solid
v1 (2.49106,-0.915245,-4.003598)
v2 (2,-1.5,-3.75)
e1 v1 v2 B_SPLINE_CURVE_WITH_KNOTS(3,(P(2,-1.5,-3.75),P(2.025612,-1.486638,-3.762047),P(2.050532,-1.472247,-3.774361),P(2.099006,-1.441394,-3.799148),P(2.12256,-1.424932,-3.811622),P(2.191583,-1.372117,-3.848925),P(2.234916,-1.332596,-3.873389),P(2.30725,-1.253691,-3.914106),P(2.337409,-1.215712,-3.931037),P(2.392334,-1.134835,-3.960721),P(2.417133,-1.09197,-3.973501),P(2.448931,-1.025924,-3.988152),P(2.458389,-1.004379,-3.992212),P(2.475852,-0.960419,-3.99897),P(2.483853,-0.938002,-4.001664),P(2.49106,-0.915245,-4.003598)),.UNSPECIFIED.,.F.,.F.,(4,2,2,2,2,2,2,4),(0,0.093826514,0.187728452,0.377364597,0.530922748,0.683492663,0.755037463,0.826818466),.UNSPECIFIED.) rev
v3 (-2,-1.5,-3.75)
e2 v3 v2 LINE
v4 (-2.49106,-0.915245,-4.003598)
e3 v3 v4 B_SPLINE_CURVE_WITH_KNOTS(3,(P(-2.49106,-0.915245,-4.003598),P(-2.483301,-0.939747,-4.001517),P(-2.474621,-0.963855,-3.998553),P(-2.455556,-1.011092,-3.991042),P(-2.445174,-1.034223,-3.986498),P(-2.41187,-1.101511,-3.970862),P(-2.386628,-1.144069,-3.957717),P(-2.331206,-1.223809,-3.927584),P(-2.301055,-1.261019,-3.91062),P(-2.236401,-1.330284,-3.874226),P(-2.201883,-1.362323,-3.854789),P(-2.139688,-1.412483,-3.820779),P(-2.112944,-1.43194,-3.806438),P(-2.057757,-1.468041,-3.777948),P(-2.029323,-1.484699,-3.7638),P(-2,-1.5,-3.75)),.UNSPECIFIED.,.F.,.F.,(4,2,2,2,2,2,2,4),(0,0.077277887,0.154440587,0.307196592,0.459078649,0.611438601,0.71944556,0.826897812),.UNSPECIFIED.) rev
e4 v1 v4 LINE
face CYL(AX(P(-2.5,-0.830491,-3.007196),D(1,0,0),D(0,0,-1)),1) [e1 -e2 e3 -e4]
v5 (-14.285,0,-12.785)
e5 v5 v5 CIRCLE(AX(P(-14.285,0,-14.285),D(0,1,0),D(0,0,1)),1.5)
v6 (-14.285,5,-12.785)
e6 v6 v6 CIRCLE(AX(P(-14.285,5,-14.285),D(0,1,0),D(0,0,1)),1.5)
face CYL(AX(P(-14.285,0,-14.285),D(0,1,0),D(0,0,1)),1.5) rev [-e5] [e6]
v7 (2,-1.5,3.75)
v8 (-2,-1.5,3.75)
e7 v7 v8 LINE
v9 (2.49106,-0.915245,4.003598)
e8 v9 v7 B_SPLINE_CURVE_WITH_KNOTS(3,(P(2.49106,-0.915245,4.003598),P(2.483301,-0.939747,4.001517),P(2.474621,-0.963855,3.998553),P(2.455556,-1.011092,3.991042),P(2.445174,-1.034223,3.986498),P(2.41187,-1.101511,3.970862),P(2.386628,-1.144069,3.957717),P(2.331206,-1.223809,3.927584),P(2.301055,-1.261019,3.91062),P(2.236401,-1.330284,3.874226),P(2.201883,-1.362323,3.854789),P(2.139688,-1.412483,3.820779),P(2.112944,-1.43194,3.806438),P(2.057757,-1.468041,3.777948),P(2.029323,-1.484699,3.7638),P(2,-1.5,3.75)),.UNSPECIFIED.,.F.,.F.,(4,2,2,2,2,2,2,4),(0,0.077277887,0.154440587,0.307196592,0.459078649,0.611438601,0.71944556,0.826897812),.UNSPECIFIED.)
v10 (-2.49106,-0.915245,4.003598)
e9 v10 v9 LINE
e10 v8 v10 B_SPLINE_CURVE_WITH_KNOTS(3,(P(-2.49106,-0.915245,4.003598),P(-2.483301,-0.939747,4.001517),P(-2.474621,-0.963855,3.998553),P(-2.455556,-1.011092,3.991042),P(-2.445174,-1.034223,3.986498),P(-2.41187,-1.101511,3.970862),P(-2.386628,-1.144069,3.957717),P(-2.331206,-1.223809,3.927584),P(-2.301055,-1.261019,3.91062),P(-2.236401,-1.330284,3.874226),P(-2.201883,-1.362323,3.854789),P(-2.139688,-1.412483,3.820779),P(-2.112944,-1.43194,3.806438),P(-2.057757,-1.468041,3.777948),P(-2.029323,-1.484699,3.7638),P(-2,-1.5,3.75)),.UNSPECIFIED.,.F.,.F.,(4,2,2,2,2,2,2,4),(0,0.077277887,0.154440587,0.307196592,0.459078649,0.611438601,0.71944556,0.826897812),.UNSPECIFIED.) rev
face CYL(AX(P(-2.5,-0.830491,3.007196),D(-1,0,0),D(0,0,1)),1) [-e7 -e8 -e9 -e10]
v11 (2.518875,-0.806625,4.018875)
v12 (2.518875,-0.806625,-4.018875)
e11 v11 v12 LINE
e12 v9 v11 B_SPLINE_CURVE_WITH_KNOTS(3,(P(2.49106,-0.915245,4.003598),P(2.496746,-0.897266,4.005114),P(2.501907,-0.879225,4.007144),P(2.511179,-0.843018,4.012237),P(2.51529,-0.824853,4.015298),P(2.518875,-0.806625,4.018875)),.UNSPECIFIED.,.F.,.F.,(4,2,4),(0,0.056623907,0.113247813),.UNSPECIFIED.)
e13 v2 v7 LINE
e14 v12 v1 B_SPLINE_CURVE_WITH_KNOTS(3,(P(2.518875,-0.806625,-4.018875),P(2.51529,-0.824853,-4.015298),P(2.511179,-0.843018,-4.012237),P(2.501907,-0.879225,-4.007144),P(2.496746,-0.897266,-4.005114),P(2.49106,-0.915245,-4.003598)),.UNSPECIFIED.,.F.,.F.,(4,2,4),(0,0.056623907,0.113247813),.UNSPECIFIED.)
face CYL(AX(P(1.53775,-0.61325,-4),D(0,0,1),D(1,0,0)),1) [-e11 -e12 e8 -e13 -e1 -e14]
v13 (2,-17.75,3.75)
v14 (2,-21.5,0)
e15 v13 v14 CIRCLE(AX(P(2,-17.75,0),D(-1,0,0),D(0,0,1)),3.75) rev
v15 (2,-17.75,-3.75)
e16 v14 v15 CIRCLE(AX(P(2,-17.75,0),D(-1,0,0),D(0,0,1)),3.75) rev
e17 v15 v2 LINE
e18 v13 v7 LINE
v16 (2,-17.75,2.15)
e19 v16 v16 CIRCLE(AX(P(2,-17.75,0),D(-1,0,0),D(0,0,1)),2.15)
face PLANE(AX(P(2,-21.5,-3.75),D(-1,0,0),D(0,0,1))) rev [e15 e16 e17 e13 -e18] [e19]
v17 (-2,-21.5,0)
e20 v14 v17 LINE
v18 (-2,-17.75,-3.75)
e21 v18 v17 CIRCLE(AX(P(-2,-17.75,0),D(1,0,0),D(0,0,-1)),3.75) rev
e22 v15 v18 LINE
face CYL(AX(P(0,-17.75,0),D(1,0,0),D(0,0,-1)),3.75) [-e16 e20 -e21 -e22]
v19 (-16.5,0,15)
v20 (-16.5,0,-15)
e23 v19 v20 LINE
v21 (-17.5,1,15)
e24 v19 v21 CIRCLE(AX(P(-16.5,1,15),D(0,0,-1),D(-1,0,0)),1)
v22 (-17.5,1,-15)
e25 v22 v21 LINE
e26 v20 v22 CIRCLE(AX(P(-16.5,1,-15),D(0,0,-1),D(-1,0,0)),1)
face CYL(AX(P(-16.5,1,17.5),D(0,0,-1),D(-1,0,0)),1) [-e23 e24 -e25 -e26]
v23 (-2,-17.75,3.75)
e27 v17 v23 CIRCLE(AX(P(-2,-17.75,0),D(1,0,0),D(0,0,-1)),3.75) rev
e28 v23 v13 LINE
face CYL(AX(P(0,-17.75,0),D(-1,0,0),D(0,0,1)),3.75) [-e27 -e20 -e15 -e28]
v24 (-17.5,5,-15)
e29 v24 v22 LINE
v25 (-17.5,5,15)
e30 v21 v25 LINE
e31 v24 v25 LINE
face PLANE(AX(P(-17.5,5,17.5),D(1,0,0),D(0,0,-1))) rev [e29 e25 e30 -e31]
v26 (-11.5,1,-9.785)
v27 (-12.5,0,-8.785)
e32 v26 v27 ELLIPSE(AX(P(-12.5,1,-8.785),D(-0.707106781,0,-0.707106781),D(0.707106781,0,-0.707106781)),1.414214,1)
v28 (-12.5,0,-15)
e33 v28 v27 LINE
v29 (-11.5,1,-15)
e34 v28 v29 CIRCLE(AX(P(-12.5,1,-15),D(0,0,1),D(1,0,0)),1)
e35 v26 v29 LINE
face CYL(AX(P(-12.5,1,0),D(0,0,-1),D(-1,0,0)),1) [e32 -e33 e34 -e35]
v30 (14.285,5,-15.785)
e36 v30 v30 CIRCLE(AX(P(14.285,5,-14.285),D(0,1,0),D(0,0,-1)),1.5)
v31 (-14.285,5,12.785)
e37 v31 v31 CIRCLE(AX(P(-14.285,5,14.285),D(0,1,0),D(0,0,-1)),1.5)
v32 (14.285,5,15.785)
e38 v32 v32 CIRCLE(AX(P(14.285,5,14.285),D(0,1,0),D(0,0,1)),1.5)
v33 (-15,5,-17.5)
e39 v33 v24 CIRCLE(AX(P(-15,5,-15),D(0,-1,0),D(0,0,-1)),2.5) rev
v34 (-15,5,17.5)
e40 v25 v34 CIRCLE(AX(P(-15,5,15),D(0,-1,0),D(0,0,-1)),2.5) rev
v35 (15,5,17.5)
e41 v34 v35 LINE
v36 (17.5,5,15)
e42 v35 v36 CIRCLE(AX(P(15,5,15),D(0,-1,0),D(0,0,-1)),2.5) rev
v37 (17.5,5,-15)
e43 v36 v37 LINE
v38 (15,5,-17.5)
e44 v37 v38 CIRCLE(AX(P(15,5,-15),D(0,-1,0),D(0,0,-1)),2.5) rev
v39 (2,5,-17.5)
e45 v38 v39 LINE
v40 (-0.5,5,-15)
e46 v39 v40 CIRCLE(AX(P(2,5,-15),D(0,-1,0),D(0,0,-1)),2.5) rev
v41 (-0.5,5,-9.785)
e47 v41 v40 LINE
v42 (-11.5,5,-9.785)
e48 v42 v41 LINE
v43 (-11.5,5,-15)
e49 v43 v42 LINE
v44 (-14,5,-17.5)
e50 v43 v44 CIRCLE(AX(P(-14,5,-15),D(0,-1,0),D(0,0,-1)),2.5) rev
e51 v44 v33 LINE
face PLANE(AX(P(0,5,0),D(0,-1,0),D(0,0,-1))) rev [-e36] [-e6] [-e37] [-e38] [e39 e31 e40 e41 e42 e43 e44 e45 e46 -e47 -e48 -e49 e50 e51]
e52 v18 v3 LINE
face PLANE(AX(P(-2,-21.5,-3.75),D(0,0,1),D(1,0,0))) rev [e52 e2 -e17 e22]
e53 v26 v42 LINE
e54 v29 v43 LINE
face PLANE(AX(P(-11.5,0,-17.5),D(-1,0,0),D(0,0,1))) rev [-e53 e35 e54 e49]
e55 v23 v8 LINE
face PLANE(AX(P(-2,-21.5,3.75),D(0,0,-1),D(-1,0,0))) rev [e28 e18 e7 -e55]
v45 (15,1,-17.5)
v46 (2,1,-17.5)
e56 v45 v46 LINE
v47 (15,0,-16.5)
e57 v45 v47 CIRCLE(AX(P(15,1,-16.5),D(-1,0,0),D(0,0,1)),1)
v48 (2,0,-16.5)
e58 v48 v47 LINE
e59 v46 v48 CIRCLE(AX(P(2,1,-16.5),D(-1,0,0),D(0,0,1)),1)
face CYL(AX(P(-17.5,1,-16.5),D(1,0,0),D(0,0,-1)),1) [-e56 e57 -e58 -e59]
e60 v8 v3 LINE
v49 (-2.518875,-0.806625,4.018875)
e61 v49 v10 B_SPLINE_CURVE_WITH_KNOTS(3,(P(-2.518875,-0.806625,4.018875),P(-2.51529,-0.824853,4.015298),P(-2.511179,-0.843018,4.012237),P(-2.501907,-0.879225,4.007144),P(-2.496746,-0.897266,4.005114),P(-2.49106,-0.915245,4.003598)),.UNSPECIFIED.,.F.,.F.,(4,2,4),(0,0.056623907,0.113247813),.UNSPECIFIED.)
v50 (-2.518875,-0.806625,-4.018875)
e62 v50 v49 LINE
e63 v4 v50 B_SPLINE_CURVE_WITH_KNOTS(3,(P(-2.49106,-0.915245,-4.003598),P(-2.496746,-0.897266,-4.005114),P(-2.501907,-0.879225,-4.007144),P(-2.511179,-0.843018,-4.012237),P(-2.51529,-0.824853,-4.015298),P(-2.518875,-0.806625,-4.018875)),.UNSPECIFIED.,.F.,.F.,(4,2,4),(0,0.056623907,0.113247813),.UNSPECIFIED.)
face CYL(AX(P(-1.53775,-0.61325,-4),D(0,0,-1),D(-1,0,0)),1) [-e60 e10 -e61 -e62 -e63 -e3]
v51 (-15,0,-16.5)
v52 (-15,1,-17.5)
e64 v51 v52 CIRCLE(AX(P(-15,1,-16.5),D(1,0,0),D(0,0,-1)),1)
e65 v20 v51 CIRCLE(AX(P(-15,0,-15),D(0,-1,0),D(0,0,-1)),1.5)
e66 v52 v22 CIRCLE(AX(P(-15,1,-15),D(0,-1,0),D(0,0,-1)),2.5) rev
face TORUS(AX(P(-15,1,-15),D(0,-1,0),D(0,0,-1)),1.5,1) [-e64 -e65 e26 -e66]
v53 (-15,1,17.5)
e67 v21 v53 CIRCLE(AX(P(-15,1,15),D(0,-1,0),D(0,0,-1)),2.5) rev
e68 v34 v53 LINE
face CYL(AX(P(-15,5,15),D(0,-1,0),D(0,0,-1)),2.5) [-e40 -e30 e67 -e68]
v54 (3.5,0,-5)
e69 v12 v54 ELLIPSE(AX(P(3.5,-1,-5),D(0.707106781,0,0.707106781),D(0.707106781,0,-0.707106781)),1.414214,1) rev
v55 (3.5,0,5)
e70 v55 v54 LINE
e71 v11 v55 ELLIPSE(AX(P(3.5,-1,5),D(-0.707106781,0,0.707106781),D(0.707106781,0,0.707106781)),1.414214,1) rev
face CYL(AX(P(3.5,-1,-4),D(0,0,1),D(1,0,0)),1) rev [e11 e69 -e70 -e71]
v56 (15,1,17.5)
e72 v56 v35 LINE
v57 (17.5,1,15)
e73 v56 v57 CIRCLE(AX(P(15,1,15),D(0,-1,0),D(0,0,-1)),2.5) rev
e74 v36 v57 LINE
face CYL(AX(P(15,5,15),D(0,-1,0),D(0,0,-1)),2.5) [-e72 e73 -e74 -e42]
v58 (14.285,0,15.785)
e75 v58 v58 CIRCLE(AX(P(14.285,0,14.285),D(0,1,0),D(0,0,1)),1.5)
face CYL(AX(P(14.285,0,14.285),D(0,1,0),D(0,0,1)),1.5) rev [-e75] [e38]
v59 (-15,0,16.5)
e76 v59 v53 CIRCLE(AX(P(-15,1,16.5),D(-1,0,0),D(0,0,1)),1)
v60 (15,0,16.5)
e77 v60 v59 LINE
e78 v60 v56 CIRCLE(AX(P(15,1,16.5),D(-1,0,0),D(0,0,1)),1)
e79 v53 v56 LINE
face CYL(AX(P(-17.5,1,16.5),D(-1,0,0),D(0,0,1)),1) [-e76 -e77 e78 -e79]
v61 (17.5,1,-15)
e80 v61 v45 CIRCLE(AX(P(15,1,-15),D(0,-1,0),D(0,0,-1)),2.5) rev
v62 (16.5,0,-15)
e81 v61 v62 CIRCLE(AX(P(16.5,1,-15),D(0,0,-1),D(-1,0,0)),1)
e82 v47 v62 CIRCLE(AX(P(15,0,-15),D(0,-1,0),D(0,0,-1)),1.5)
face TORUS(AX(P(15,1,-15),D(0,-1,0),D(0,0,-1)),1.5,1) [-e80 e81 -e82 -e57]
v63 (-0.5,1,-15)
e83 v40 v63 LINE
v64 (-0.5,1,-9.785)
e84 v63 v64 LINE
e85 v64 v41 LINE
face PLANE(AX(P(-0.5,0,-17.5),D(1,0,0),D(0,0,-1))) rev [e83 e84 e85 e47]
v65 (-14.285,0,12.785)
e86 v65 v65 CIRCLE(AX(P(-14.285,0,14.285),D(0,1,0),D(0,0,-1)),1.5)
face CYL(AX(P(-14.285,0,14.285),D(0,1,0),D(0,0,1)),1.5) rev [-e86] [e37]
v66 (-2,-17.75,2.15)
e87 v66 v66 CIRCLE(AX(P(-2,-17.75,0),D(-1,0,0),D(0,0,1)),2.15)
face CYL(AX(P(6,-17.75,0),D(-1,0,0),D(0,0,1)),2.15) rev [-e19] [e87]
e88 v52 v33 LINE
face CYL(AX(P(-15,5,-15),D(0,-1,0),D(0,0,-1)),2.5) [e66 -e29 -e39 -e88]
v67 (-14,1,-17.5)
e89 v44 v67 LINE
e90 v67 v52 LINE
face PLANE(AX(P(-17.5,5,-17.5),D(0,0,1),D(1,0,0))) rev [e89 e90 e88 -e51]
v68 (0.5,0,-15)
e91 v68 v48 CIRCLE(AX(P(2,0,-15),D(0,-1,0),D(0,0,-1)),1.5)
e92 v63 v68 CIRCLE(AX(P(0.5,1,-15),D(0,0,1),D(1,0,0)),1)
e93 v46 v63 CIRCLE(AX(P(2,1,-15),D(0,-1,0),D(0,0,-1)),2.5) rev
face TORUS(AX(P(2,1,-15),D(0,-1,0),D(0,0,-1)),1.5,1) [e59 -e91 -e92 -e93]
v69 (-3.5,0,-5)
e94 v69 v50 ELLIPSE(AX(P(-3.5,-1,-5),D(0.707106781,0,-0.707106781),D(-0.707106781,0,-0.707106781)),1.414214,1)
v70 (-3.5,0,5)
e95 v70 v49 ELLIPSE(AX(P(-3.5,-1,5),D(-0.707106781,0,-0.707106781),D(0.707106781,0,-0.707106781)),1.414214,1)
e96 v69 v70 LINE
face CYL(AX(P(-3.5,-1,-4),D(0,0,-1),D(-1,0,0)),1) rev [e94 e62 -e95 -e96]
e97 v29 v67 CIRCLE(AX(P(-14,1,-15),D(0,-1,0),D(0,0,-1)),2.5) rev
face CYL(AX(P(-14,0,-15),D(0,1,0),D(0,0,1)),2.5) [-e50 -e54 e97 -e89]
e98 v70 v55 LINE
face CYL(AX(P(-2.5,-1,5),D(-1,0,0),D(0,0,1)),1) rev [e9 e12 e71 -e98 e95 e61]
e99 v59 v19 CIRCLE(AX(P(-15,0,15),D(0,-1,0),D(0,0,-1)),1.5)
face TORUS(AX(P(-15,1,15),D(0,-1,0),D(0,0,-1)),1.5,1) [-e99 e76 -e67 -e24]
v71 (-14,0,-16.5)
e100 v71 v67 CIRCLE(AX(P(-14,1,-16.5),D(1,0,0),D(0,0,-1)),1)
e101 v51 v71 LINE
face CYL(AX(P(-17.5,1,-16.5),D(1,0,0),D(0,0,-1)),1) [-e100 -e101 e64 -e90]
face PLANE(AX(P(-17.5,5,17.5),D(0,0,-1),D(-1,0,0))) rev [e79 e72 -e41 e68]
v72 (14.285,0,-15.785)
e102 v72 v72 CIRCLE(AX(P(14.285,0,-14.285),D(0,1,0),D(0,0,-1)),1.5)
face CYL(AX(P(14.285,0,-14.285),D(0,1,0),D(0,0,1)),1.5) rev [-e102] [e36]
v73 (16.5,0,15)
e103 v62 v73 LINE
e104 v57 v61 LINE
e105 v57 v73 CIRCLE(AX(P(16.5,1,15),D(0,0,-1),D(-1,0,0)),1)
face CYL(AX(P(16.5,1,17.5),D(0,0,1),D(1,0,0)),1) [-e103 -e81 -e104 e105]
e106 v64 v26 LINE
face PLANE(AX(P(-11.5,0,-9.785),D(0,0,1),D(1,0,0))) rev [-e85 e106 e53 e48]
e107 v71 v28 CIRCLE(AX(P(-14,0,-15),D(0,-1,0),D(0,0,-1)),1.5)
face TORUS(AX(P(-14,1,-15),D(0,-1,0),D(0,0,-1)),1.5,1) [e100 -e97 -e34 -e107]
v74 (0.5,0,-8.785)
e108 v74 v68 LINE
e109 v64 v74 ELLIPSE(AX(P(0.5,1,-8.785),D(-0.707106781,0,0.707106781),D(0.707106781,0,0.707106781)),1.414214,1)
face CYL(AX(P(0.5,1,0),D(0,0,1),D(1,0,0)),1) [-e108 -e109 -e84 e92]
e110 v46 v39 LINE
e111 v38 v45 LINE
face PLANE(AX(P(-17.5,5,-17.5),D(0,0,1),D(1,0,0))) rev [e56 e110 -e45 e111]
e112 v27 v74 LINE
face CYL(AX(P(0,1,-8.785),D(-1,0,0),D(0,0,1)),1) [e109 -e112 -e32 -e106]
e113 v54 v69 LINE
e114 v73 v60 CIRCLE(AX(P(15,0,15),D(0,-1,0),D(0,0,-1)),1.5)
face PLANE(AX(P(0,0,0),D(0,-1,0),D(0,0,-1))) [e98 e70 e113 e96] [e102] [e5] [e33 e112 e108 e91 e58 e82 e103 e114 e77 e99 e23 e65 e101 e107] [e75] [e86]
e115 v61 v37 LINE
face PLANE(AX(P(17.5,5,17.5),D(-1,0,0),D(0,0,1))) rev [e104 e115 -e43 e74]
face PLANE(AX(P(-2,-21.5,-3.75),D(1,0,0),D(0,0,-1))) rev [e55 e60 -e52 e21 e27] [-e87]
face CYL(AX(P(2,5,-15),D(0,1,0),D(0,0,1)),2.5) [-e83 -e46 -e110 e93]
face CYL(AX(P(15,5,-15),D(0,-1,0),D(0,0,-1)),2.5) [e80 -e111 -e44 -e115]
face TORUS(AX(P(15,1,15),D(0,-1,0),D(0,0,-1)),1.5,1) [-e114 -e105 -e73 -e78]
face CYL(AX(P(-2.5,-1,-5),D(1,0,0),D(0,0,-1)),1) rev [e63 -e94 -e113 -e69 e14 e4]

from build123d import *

# Parameters (mm, degrees)
SKETCH_2_W          = 35
SKETCH_2_H          = 35
EXTRUDE_1_DEPTH     = 5
SKETCH_3_R          = 1.5
SKETCH_3_W          = 11
SKETCH_3_H          = 7.715
CUT_EXTRUDE_1_DEPTH = 26.248762346
SKETCH_4_W          = 5
SKETCH_4_H          = 8
EXTRUDE_2_DEPTH     = 1.5
SKETCH_5_W          = 4
SKETCH_5_H          = 7.5
EXTRUDE_3_DEPTH     = 20
FILLET_1_R          = 3.75
SKETCH_6_R          = 2.15
CUT_EXTRUDE_2_DEPTH = 8
FILLET_2_R          = 2.5
FILLET_3_R          = 2.5
FILLET_4_R          = 1
FILLET_5_R          = 1
FILLET_6_R          = 1


# Some blends are built 0.0001 mm under size
with BuildPart() as part:
    # 草图2 → 凸台-拉伸1 (new body)
    with BuildSketch(Plane(origin=(0, 0, 0), x_dir=(1, 0, 0), z_dir=(0, 1, 0))):
        Rectangle(SKETCH_2_W, SKETCH_2_H)
    extrude(amount=EXTRUDE_1_DEPTH)

    # 草图3 → 切除-拉伸1 (cut, through all)
    with BuildSketch(Plane(origin=(0, 5, 0), x_dir=(1, 0, 0), z_dir=(0, 1, 0))):
        with Locations(Location((-14.285, 14.285, 0), (0, 0, 270))):
            Circle(SKETCH_3_R)
        with Locations(Location((-14.285, -14.285, 0), (0, 0, 90))):
            Circle(SKETCH_3_R)
        with Locations(Location((14.285, -14.285, 0), (0, 0, 270))):
            Circle(SKETCH_3_R)
        with Locations(Location((14.285, 14.285, 0), (0, 0, 90))):
            Circle(SKETCH_3_R)
        with Locations((-6, 13.6425)):
            Rectangle(SKETCH_3_W, SKETCH_3_H)
    extrude(amount=-CUT_EXTRUDE_1_DEPTH, mode=Mode.SUBTRACT)

    # 草图4 → 凸台-拉伸2 (add)
    with BuildSketch(Plane.XZ):
        Rectangle(SKETCH_4_W, SKETCH_4_H)
    extrude(amount=EXTRUDE_2_DEPTH)

    # 草图5 → 凸台-拉伸3 (add)
    with BuildSketch(Plane.XZ.offset(1.5)):
        Rectangle(SKETCH_5_W, SKETCH_5_H)
    extrude(amount=EXTRUDE_3_DEPTH)

    # 圆角1
    fillet_1_edges = [part.edges().sort_by_distance(p)[0] for p in [
        (0, -21.5, -3.75),
        (0, -21.5, 3.75),
    ]]
    fillet(fillet_1_edges, radius=FILLET_1_R - 0.0001)  # a hair under: the kernel refuses the full size

    # 草图6 → 切除-拉伸2 (cut)
    with BuildSketch(Plane.ZY.offset(2)):
        with Locations((0, -17.75)):
            Circle(SKETCH_6_R)
    extrude(amount=-CUT_EXTRUDE_2_DEPTH, mode=Mode.SUBTRACT)

    # 圆角2
    fillet_2_edges = [part.edges().sort_by_distance(p)[0] for p in [
        (17.5, 2.5, 17.5),
        (-17.5, 2.5, 17.5),
        (-17.5, 2.5, -17.5),
        (17.5, 2.5, -17.5),
    ]]
    fillet(fillet_2_edges, radius=FILLET_2_R)

    # 圆角3
    fillet_3_edges = [part.edges().sort_by_distance(p)[0] for p in [
        (-11.5, 2.5, -17.5),
        (-0.5, 2.5, -17.5),
    ]]
    fillet(fillet_3_edges, radius=FILLET_3_R)

    # 圆角4
    fillet_4_edges = [part.edges().sort_by_distance(p)[0] for p in [
        (-14.5, 0, -17.5),
        (-11.5, 0, -12.3925),
        (-12.232233047, 0, -16.767766953),
        (0.232233047, 0, -16.767766953),
        (-0.5, 0, -12.3925),
        (-6, 0, -9.785),
        (8.5, 0, -17.5),
        (17.5, 0, 0),
        (0, 0, 17.5),
        (-17.5, 0, 0),
        (-16.767766953, 0, -16.767766953),
        (-16.767766953, 0, 16.767766953),
        (16.767766953, 0, 16.767766953),
        (16.767766953, 0, -16.767766953),
    ]]
    fillet(fillet_4_edges, radius=FILLET_4_R)

    # 圆角5
    fillet_5_edges = [part.edges().sort_by_distance(p)[0] for p in [
        (2.5, 0, 0),
        (0, 0, 4),
        (-2.5, 0, 0),
        (0, 0, -4),
    ]]
    fillet(fillet_5_edges, radius=FILLET_5_R)

    # 圆角6
    # the kernel refuses this fillet: 1 mm, written as the material it takes off along each edge
    with BuildSketch(Plane(origin=(-3.961914255, -1.5, -4), x_dir=(0, 0.9999810692345785, -0.006153143299889555), z_dir=(1, 0, 0)), Plane(origin=(3.961914255, -1.5, 4), x_dir=(0, 0.9999810692345785, 0.006153143299889555), z_dir=(-1, 0, 0))) as fillet_6_piece_1:
        with BuildLine():
            CenterArc((0.663387726, 0.996904498), FILLET_6_R, 228.323350496, 37.167285461)
            Line((-0.001538286, 0.249995267), (-0.068030887, 0.175304344))
            ThreePointArc((-0.068030887, 0.175304344), (-0.10076725, 0.124382319), (-0.099998107, -0.000615314))
            Line((-0.099998107, -0.000615314), (0.000615314, -0.099998107))
            ThreePointArc((0.000615314, -0.099998107), (0.500605849, -0.096921535), (0.5769035, -0.09969045))
            Line((0.5769035, -0.09969045), (0.584765702, 0))
        make_face()
    extrude(amount=7.923828511, mode=Mode.SUBTRACT)
    with BuildSketch(Plane(origin=(-2.5, -1.5, 5.734079277), x_dir=(-0.027211919166029507, 0.9996296871618517, 0), z_dir=(0, 0, -1)), Plane(origin=(2.5, -1.5, -5.734079277), x_dir=(0.02721191916602949, 0.9996296871618517, 0), z_dir=(0, 0, 1))) as fillet_6_piece_2:
        with BuildLine():
            CenterArc((0.860236658, 0.986023728), FILLET_6_R, 209.091705597, 51.317812547)
            Line((-0.01360596, 0.499814844), (-0.100990221, 0.451193955))
            ThreePointArc((-0.100990221, 0.451193955), (-0.106765949, 0.24718623), (-0.099962969, -0.002721192))
            Line((-0.099962969, -0.002721192), (0.002721192, -0.099962969))
            ThreePointArc((0.002721192, -0.099962969), (0.502536035, -0.086357009), (0.676971216, -0.098602373))
            Line((0.676971216, -0.098602373), (0.693631711, 0))
        make_face()
    extrude(amount=11.468158553, mode=Mode.SUBTRACT)


solid = part.part
